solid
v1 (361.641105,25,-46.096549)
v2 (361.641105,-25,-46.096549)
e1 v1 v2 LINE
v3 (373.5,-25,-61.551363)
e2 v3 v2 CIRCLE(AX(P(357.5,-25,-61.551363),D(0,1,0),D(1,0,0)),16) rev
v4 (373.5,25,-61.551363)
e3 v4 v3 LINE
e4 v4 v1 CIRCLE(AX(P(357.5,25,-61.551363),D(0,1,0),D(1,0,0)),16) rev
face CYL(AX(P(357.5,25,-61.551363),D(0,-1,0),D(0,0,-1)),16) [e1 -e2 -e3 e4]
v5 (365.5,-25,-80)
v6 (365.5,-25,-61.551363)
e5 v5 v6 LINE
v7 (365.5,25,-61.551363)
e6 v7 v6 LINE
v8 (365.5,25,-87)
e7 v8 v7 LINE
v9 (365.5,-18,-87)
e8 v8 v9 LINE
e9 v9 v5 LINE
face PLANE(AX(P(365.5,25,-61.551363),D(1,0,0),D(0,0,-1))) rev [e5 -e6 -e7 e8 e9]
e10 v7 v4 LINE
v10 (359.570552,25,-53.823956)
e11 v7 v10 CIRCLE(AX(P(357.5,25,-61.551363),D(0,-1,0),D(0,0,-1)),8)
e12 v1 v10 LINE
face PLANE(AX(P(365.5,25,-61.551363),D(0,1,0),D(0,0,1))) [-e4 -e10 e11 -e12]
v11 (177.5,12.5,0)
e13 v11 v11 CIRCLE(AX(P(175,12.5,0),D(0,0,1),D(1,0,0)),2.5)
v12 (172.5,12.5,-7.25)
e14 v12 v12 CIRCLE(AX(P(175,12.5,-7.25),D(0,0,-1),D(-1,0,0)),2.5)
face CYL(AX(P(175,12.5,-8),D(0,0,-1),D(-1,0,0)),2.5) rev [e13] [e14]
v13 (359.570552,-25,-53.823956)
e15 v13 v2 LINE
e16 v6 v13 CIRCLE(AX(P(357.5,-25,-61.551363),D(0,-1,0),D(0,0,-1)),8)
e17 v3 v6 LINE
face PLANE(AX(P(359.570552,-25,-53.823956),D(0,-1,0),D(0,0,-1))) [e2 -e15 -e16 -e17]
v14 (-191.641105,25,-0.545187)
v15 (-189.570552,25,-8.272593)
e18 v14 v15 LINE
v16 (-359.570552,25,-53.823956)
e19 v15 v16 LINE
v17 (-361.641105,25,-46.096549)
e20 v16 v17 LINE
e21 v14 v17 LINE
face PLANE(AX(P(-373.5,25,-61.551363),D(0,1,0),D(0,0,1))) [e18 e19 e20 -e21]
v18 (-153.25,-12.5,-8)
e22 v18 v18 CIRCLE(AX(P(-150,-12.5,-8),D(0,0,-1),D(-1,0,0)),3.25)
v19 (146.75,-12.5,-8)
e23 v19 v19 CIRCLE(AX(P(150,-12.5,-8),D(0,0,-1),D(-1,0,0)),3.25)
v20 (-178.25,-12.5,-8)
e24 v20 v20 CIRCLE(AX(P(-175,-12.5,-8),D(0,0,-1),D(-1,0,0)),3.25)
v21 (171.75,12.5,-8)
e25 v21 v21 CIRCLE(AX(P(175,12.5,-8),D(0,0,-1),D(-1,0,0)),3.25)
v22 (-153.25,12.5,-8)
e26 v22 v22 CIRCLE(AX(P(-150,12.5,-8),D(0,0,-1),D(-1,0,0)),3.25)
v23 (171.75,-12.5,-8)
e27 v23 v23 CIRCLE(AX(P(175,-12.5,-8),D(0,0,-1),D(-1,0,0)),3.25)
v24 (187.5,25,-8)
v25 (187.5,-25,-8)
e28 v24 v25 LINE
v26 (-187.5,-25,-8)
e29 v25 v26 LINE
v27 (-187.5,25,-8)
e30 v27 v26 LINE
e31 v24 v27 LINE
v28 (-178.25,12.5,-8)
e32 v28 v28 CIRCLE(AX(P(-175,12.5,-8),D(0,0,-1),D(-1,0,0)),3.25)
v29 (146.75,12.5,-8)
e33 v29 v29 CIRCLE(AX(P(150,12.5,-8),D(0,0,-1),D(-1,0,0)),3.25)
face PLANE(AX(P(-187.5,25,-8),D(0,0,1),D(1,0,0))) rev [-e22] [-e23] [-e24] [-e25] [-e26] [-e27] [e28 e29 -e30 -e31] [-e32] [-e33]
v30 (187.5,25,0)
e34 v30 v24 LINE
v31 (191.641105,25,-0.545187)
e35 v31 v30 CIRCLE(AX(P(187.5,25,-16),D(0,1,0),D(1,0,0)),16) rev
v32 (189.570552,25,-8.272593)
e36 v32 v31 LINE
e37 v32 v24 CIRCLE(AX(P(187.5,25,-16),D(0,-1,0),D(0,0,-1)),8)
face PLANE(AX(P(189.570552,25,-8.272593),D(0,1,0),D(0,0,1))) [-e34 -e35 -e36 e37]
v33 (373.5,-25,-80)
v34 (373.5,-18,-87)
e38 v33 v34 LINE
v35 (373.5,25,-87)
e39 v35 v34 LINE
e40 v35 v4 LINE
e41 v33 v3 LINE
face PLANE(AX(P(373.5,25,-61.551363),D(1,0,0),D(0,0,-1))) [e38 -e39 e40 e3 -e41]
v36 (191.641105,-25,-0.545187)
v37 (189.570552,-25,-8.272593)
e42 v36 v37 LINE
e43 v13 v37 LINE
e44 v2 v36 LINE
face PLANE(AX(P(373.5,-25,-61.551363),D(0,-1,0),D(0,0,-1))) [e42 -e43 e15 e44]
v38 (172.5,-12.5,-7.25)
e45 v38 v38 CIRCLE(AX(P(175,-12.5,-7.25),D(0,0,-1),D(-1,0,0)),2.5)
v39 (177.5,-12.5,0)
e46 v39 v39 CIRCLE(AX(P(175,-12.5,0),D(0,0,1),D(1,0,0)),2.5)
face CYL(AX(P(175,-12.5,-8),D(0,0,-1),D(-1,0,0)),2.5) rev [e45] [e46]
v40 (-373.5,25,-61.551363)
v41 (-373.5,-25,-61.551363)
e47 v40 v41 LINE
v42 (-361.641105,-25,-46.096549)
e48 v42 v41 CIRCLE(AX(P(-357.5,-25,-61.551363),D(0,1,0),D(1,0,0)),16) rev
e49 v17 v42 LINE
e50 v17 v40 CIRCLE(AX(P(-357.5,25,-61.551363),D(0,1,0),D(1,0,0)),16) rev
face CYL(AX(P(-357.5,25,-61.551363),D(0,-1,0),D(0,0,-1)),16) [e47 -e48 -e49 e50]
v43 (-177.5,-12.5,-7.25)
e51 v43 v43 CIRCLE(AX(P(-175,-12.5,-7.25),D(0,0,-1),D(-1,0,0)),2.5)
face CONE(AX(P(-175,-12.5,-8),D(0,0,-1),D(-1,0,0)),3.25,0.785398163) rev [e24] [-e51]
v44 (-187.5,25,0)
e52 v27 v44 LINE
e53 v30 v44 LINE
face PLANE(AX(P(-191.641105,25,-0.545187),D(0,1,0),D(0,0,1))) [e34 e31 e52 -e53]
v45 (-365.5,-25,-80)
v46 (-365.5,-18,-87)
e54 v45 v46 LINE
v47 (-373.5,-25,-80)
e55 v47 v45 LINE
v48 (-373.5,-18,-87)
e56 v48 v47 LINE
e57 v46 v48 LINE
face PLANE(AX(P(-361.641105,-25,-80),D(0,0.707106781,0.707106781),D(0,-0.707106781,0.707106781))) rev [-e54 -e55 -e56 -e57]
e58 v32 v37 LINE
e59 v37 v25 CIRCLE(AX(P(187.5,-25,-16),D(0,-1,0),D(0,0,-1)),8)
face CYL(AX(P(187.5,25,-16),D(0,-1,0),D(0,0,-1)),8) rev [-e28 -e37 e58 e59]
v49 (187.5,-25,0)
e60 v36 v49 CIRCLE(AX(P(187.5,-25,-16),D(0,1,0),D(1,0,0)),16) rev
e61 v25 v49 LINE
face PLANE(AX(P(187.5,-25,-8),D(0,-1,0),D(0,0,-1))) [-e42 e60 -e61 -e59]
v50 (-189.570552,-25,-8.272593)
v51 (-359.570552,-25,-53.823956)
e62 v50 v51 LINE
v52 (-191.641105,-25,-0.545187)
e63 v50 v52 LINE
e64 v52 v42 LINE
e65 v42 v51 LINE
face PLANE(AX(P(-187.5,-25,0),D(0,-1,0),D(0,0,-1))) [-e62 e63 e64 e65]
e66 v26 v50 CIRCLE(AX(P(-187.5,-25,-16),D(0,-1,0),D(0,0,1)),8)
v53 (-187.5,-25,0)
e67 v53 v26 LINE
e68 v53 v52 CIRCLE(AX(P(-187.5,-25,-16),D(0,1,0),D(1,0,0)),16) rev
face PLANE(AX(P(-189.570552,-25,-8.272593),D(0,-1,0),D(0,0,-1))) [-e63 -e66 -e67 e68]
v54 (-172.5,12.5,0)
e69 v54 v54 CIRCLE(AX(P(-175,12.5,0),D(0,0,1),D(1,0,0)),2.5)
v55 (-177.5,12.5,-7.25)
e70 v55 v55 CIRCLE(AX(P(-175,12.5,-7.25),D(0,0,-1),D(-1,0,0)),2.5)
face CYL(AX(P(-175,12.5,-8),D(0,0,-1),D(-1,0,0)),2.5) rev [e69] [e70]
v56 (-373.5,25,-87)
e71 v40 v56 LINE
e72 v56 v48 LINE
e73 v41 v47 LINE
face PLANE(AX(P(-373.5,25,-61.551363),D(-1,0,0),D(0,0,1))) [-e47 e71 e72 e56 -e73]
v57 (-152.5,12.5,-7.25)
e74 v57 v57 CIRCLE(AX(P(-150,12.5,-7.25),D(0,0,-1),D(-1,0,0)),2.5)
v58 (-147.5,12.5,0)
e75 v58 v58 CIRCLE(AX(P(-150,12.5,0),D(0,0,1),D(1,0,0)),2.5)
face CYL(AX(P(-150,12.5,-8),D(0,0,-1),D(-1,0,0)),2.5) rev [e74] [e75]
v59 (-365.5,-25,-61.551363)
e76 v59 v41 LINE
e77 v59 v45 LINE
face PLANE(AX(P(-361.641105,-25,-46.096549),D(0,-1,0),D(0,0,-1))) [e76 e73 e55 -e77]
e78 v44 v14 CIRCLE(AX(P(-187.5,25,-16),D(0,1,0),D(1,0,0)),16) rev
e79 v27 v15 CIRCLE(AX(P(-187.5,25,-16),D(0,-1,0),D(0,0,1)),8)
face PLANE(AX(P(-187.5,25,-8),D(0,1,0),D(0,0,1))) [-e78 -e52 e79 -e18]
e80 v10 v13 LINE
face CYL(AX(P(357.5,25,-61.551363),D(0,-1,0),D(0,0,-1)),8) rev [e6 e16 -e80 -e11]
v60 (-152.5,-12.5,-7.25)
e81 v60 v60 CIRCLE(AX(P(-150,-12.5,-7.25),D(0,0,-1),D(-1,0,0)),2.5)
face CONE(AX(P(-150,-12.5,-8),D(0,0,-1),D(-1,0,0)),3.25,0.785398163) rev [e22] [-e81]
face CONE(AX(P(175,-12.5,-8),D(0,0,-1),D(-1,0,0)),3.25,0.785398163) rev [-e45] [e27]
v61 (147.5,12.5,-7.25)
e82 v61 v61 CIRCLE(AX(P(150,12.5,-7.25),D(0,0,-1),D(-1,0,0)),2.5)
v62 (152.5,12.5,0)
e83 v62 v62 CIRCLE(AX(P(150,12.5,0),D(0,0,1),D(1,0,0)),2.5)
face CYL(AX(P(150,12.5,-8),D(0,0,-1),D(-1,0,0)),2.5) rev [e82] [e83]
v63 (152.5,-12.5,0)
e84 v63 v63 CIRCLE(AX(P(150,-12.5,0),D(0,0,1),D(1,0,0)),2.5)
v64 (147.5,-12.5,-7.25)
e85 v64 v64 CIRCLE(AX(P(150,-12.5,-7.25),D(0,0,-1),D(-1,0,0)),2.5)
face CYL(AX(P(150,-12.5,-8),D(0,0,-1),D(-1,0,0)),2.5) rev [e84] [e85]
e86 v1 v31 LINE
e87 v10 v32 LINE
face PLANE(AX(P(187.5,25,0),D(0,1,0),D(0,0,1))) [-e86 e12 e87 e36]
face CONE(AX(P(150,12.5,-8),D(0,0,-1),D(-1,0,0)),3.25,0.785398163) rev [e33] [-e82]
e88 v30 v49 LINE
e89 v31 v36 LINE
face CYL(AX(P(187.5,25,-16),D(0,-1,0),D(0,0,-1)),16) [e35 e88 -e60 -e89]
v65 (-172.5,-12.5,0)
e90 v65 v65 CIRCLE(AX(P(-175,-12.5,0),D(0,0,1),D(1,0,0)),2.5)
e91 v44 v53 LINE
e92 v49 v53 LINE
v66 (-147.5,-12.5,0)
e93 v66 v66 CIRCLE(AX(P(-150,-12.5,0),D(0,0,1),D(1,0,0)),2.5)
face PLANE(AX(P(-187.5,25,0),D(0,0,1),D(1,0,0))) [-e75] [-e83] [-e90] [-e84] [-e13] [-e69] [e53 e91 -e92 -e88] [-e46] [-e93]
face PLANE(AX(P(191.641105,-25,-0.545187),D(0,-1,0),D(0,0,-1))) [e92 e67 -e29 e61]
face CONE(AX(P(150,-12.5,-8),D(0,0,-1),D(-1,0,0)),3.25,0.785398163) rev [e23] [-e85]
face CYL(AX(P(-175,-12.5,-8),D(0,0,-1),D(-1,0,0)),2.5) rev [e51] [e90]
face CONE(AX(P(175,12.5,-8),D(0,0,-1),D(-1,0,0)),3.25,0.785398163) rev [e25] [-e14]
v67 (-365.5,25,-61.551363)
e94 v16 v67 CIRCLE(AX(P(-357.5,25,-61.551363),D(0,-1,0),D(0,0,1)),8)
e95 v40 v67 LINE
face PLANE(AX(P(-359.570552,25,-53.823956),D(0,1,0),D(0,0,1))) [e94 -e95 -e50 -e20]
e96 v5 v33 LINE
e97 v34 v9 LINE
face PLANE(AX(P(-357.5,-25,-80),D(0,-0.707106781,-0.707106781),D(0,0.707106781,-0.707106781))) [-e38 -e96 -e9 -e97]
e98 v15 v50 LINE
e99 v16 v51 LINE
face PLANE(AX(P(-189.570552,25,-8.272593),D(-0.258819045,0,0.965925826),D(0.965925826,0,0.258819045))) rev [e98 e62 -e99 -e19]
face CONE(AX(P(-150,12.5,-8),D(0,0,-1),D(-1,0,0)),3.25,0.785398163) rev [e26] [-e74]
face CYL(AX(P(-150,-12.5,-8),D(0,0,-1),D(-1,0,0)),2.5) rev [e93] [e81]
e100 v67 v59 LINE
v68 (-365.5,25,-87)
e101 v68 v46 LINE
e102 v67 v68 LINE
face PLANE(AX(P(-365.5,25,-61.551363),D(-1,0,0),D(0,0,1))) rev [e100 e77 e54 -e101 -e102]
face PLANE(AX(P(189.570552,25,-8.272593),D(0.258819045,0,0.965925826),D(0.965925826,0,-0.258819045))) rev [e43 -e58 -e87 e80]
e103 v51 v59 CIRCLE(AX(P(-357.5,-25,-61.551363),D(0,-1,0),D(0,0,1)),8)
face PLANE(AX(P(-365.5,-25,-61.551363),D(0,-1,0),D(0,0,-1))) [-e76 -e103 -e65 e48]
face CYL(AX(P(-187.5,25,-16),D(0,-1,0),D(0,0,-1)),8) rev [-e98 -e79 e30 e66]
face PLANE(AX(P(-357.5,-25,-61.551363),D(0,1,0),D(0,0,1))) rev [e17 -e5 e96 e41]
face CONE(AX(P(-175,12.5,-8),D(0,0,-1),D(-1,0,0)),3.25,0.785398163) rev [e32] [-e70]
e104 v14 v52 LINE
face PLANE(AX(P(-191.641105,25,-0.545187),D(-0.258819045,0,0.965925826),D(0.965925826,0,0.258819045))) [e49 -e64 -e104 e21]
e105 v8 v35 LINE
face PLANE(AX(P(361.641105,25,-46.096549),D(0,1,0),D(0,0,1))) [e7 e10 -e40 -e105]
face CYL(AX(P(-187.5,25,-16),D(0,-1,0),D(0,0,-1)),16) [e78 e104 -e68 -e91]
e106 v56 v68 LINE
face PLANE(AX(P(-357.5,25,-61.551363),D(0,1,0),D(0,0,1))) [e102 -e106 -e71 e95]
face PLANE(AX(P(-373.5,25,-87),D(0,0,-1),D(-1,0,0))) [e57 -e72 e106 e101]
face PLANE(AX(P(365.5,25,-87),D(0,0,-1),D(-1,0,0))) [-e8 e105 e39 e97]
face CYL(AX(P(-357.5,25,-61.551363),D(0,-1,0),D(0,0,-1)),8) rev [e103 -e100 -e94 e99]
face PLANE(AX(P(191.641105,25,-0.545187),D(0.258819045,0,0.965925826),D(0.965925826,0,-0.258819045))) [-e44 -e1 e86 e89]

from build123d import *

# Parameters (mm, degrees)
SM_BASE_FLANGE_2_DEPTH = 25
M6X1_01_D              = 5
M6X1_01_CSINK_D        = 6.5
M6X1_01_CSINK_ANGLE    = 90
CHAMFER_1_SIZE         = 7


# Sheet-metal steps are written as plain solids
with BuildPart() as part:
    # Sketch 2 → Базовая кромка2 (new, symmetric)
    with BuildSketch(Plane(origin=(0, 0, 0), x_dir=(1, 0, 0), z_dir=(0, 1, 0))):
        with BuildLine():
            Line((-365.5, 87), (-365.5, 61.551362713))
            ThreePointArc((-365.5, 61.551362713), (-363.846826722, 56.681271281), (-359.570552361, 53.823956103))
            Line((-359.570552361, 53.823956103), (-189.570552361, 8.27259339))
            ThreePointArc((-189.570552361, 8.27259339), (-188.544209538, 8.068441109), (-187.5, 8))
            Line((-187.5, 8), (187.5, 8))
            ThreePointArc((187.5, 8), (188.544209538, 8.068441109), (189.570552361, 8.27259339))
            Line((189.570552361, 8.27259339), (359.570552361, 53.823956103))
            ThreePointArc((359.570552361, 53.823956103), (363.846826722, 56.681271281), (365.5, 61.551362713))
            Line((365.5, 61.551362713), (365.5, 87))
            Line((365.5, 87), (373.5, 87))
            Line((373.5, 87), (373.5, 61.551362713))
            ThreePointArc((373.5, 61.551362713), (370.193653445, 51.811179849), (361.641104722, 46.096549493))
            Line((361.641104722, 46.096549493), (191.641104722, 0.545186779))
            ThreePointArc((191.641104722, 0.545186779), (189.588419076, 0.136882218), (187.5, 0))
            Line((187.5, 0), (-187.5, 0))
            ThreePointArc((-187.5, 0), (-189.588419076, 0.136882218), (-191.641104722, 0.545186779))
            Line((-191.641104722, 0.545186779), (-361.641104722, 46.096549493))
            ThreePointArc((-361.641104722, 46.096549493), (-370.193653445, 51.811179849), (-373.5, 61.551362713))
            Line((-373.5, 61.551362713), (-373.5, 87))
            Line((-373.5, 87), (-365.5, 87))
        make_face()
    extrude(amount=SM_BASE_FLANGE_2_DEPTH, both=True)

    # Отверстие обработанное метчиком M6x1.01 (through all)
    with Locations(Plane(origin=(175, 12.5, -8), x_dir=(-1, 0, 0), z_dir=(0, 0, -1))):
        with Locations((0, 0), (25, 0), (25, -25), (0, -25), (325, 0), (350, 0), (350, -25), (325, -25)):
            CounterSinkHole(M6X1_01_D / 2, M6X1_01_CSINK_D / 2, counter_sink_angle=M6X1_01_CSINK_ANGLE)

    # Фаска1
    chamfer_1_edges = [part.edges().sort_by_distance(p)[0] for p in [
        (369.5, -25, -87),
        (-369.5, -25, -87),
    ]]
    chamfer(chamfer_1_edges, length=CHAMFER_1_SIZE)


solid = part.part
